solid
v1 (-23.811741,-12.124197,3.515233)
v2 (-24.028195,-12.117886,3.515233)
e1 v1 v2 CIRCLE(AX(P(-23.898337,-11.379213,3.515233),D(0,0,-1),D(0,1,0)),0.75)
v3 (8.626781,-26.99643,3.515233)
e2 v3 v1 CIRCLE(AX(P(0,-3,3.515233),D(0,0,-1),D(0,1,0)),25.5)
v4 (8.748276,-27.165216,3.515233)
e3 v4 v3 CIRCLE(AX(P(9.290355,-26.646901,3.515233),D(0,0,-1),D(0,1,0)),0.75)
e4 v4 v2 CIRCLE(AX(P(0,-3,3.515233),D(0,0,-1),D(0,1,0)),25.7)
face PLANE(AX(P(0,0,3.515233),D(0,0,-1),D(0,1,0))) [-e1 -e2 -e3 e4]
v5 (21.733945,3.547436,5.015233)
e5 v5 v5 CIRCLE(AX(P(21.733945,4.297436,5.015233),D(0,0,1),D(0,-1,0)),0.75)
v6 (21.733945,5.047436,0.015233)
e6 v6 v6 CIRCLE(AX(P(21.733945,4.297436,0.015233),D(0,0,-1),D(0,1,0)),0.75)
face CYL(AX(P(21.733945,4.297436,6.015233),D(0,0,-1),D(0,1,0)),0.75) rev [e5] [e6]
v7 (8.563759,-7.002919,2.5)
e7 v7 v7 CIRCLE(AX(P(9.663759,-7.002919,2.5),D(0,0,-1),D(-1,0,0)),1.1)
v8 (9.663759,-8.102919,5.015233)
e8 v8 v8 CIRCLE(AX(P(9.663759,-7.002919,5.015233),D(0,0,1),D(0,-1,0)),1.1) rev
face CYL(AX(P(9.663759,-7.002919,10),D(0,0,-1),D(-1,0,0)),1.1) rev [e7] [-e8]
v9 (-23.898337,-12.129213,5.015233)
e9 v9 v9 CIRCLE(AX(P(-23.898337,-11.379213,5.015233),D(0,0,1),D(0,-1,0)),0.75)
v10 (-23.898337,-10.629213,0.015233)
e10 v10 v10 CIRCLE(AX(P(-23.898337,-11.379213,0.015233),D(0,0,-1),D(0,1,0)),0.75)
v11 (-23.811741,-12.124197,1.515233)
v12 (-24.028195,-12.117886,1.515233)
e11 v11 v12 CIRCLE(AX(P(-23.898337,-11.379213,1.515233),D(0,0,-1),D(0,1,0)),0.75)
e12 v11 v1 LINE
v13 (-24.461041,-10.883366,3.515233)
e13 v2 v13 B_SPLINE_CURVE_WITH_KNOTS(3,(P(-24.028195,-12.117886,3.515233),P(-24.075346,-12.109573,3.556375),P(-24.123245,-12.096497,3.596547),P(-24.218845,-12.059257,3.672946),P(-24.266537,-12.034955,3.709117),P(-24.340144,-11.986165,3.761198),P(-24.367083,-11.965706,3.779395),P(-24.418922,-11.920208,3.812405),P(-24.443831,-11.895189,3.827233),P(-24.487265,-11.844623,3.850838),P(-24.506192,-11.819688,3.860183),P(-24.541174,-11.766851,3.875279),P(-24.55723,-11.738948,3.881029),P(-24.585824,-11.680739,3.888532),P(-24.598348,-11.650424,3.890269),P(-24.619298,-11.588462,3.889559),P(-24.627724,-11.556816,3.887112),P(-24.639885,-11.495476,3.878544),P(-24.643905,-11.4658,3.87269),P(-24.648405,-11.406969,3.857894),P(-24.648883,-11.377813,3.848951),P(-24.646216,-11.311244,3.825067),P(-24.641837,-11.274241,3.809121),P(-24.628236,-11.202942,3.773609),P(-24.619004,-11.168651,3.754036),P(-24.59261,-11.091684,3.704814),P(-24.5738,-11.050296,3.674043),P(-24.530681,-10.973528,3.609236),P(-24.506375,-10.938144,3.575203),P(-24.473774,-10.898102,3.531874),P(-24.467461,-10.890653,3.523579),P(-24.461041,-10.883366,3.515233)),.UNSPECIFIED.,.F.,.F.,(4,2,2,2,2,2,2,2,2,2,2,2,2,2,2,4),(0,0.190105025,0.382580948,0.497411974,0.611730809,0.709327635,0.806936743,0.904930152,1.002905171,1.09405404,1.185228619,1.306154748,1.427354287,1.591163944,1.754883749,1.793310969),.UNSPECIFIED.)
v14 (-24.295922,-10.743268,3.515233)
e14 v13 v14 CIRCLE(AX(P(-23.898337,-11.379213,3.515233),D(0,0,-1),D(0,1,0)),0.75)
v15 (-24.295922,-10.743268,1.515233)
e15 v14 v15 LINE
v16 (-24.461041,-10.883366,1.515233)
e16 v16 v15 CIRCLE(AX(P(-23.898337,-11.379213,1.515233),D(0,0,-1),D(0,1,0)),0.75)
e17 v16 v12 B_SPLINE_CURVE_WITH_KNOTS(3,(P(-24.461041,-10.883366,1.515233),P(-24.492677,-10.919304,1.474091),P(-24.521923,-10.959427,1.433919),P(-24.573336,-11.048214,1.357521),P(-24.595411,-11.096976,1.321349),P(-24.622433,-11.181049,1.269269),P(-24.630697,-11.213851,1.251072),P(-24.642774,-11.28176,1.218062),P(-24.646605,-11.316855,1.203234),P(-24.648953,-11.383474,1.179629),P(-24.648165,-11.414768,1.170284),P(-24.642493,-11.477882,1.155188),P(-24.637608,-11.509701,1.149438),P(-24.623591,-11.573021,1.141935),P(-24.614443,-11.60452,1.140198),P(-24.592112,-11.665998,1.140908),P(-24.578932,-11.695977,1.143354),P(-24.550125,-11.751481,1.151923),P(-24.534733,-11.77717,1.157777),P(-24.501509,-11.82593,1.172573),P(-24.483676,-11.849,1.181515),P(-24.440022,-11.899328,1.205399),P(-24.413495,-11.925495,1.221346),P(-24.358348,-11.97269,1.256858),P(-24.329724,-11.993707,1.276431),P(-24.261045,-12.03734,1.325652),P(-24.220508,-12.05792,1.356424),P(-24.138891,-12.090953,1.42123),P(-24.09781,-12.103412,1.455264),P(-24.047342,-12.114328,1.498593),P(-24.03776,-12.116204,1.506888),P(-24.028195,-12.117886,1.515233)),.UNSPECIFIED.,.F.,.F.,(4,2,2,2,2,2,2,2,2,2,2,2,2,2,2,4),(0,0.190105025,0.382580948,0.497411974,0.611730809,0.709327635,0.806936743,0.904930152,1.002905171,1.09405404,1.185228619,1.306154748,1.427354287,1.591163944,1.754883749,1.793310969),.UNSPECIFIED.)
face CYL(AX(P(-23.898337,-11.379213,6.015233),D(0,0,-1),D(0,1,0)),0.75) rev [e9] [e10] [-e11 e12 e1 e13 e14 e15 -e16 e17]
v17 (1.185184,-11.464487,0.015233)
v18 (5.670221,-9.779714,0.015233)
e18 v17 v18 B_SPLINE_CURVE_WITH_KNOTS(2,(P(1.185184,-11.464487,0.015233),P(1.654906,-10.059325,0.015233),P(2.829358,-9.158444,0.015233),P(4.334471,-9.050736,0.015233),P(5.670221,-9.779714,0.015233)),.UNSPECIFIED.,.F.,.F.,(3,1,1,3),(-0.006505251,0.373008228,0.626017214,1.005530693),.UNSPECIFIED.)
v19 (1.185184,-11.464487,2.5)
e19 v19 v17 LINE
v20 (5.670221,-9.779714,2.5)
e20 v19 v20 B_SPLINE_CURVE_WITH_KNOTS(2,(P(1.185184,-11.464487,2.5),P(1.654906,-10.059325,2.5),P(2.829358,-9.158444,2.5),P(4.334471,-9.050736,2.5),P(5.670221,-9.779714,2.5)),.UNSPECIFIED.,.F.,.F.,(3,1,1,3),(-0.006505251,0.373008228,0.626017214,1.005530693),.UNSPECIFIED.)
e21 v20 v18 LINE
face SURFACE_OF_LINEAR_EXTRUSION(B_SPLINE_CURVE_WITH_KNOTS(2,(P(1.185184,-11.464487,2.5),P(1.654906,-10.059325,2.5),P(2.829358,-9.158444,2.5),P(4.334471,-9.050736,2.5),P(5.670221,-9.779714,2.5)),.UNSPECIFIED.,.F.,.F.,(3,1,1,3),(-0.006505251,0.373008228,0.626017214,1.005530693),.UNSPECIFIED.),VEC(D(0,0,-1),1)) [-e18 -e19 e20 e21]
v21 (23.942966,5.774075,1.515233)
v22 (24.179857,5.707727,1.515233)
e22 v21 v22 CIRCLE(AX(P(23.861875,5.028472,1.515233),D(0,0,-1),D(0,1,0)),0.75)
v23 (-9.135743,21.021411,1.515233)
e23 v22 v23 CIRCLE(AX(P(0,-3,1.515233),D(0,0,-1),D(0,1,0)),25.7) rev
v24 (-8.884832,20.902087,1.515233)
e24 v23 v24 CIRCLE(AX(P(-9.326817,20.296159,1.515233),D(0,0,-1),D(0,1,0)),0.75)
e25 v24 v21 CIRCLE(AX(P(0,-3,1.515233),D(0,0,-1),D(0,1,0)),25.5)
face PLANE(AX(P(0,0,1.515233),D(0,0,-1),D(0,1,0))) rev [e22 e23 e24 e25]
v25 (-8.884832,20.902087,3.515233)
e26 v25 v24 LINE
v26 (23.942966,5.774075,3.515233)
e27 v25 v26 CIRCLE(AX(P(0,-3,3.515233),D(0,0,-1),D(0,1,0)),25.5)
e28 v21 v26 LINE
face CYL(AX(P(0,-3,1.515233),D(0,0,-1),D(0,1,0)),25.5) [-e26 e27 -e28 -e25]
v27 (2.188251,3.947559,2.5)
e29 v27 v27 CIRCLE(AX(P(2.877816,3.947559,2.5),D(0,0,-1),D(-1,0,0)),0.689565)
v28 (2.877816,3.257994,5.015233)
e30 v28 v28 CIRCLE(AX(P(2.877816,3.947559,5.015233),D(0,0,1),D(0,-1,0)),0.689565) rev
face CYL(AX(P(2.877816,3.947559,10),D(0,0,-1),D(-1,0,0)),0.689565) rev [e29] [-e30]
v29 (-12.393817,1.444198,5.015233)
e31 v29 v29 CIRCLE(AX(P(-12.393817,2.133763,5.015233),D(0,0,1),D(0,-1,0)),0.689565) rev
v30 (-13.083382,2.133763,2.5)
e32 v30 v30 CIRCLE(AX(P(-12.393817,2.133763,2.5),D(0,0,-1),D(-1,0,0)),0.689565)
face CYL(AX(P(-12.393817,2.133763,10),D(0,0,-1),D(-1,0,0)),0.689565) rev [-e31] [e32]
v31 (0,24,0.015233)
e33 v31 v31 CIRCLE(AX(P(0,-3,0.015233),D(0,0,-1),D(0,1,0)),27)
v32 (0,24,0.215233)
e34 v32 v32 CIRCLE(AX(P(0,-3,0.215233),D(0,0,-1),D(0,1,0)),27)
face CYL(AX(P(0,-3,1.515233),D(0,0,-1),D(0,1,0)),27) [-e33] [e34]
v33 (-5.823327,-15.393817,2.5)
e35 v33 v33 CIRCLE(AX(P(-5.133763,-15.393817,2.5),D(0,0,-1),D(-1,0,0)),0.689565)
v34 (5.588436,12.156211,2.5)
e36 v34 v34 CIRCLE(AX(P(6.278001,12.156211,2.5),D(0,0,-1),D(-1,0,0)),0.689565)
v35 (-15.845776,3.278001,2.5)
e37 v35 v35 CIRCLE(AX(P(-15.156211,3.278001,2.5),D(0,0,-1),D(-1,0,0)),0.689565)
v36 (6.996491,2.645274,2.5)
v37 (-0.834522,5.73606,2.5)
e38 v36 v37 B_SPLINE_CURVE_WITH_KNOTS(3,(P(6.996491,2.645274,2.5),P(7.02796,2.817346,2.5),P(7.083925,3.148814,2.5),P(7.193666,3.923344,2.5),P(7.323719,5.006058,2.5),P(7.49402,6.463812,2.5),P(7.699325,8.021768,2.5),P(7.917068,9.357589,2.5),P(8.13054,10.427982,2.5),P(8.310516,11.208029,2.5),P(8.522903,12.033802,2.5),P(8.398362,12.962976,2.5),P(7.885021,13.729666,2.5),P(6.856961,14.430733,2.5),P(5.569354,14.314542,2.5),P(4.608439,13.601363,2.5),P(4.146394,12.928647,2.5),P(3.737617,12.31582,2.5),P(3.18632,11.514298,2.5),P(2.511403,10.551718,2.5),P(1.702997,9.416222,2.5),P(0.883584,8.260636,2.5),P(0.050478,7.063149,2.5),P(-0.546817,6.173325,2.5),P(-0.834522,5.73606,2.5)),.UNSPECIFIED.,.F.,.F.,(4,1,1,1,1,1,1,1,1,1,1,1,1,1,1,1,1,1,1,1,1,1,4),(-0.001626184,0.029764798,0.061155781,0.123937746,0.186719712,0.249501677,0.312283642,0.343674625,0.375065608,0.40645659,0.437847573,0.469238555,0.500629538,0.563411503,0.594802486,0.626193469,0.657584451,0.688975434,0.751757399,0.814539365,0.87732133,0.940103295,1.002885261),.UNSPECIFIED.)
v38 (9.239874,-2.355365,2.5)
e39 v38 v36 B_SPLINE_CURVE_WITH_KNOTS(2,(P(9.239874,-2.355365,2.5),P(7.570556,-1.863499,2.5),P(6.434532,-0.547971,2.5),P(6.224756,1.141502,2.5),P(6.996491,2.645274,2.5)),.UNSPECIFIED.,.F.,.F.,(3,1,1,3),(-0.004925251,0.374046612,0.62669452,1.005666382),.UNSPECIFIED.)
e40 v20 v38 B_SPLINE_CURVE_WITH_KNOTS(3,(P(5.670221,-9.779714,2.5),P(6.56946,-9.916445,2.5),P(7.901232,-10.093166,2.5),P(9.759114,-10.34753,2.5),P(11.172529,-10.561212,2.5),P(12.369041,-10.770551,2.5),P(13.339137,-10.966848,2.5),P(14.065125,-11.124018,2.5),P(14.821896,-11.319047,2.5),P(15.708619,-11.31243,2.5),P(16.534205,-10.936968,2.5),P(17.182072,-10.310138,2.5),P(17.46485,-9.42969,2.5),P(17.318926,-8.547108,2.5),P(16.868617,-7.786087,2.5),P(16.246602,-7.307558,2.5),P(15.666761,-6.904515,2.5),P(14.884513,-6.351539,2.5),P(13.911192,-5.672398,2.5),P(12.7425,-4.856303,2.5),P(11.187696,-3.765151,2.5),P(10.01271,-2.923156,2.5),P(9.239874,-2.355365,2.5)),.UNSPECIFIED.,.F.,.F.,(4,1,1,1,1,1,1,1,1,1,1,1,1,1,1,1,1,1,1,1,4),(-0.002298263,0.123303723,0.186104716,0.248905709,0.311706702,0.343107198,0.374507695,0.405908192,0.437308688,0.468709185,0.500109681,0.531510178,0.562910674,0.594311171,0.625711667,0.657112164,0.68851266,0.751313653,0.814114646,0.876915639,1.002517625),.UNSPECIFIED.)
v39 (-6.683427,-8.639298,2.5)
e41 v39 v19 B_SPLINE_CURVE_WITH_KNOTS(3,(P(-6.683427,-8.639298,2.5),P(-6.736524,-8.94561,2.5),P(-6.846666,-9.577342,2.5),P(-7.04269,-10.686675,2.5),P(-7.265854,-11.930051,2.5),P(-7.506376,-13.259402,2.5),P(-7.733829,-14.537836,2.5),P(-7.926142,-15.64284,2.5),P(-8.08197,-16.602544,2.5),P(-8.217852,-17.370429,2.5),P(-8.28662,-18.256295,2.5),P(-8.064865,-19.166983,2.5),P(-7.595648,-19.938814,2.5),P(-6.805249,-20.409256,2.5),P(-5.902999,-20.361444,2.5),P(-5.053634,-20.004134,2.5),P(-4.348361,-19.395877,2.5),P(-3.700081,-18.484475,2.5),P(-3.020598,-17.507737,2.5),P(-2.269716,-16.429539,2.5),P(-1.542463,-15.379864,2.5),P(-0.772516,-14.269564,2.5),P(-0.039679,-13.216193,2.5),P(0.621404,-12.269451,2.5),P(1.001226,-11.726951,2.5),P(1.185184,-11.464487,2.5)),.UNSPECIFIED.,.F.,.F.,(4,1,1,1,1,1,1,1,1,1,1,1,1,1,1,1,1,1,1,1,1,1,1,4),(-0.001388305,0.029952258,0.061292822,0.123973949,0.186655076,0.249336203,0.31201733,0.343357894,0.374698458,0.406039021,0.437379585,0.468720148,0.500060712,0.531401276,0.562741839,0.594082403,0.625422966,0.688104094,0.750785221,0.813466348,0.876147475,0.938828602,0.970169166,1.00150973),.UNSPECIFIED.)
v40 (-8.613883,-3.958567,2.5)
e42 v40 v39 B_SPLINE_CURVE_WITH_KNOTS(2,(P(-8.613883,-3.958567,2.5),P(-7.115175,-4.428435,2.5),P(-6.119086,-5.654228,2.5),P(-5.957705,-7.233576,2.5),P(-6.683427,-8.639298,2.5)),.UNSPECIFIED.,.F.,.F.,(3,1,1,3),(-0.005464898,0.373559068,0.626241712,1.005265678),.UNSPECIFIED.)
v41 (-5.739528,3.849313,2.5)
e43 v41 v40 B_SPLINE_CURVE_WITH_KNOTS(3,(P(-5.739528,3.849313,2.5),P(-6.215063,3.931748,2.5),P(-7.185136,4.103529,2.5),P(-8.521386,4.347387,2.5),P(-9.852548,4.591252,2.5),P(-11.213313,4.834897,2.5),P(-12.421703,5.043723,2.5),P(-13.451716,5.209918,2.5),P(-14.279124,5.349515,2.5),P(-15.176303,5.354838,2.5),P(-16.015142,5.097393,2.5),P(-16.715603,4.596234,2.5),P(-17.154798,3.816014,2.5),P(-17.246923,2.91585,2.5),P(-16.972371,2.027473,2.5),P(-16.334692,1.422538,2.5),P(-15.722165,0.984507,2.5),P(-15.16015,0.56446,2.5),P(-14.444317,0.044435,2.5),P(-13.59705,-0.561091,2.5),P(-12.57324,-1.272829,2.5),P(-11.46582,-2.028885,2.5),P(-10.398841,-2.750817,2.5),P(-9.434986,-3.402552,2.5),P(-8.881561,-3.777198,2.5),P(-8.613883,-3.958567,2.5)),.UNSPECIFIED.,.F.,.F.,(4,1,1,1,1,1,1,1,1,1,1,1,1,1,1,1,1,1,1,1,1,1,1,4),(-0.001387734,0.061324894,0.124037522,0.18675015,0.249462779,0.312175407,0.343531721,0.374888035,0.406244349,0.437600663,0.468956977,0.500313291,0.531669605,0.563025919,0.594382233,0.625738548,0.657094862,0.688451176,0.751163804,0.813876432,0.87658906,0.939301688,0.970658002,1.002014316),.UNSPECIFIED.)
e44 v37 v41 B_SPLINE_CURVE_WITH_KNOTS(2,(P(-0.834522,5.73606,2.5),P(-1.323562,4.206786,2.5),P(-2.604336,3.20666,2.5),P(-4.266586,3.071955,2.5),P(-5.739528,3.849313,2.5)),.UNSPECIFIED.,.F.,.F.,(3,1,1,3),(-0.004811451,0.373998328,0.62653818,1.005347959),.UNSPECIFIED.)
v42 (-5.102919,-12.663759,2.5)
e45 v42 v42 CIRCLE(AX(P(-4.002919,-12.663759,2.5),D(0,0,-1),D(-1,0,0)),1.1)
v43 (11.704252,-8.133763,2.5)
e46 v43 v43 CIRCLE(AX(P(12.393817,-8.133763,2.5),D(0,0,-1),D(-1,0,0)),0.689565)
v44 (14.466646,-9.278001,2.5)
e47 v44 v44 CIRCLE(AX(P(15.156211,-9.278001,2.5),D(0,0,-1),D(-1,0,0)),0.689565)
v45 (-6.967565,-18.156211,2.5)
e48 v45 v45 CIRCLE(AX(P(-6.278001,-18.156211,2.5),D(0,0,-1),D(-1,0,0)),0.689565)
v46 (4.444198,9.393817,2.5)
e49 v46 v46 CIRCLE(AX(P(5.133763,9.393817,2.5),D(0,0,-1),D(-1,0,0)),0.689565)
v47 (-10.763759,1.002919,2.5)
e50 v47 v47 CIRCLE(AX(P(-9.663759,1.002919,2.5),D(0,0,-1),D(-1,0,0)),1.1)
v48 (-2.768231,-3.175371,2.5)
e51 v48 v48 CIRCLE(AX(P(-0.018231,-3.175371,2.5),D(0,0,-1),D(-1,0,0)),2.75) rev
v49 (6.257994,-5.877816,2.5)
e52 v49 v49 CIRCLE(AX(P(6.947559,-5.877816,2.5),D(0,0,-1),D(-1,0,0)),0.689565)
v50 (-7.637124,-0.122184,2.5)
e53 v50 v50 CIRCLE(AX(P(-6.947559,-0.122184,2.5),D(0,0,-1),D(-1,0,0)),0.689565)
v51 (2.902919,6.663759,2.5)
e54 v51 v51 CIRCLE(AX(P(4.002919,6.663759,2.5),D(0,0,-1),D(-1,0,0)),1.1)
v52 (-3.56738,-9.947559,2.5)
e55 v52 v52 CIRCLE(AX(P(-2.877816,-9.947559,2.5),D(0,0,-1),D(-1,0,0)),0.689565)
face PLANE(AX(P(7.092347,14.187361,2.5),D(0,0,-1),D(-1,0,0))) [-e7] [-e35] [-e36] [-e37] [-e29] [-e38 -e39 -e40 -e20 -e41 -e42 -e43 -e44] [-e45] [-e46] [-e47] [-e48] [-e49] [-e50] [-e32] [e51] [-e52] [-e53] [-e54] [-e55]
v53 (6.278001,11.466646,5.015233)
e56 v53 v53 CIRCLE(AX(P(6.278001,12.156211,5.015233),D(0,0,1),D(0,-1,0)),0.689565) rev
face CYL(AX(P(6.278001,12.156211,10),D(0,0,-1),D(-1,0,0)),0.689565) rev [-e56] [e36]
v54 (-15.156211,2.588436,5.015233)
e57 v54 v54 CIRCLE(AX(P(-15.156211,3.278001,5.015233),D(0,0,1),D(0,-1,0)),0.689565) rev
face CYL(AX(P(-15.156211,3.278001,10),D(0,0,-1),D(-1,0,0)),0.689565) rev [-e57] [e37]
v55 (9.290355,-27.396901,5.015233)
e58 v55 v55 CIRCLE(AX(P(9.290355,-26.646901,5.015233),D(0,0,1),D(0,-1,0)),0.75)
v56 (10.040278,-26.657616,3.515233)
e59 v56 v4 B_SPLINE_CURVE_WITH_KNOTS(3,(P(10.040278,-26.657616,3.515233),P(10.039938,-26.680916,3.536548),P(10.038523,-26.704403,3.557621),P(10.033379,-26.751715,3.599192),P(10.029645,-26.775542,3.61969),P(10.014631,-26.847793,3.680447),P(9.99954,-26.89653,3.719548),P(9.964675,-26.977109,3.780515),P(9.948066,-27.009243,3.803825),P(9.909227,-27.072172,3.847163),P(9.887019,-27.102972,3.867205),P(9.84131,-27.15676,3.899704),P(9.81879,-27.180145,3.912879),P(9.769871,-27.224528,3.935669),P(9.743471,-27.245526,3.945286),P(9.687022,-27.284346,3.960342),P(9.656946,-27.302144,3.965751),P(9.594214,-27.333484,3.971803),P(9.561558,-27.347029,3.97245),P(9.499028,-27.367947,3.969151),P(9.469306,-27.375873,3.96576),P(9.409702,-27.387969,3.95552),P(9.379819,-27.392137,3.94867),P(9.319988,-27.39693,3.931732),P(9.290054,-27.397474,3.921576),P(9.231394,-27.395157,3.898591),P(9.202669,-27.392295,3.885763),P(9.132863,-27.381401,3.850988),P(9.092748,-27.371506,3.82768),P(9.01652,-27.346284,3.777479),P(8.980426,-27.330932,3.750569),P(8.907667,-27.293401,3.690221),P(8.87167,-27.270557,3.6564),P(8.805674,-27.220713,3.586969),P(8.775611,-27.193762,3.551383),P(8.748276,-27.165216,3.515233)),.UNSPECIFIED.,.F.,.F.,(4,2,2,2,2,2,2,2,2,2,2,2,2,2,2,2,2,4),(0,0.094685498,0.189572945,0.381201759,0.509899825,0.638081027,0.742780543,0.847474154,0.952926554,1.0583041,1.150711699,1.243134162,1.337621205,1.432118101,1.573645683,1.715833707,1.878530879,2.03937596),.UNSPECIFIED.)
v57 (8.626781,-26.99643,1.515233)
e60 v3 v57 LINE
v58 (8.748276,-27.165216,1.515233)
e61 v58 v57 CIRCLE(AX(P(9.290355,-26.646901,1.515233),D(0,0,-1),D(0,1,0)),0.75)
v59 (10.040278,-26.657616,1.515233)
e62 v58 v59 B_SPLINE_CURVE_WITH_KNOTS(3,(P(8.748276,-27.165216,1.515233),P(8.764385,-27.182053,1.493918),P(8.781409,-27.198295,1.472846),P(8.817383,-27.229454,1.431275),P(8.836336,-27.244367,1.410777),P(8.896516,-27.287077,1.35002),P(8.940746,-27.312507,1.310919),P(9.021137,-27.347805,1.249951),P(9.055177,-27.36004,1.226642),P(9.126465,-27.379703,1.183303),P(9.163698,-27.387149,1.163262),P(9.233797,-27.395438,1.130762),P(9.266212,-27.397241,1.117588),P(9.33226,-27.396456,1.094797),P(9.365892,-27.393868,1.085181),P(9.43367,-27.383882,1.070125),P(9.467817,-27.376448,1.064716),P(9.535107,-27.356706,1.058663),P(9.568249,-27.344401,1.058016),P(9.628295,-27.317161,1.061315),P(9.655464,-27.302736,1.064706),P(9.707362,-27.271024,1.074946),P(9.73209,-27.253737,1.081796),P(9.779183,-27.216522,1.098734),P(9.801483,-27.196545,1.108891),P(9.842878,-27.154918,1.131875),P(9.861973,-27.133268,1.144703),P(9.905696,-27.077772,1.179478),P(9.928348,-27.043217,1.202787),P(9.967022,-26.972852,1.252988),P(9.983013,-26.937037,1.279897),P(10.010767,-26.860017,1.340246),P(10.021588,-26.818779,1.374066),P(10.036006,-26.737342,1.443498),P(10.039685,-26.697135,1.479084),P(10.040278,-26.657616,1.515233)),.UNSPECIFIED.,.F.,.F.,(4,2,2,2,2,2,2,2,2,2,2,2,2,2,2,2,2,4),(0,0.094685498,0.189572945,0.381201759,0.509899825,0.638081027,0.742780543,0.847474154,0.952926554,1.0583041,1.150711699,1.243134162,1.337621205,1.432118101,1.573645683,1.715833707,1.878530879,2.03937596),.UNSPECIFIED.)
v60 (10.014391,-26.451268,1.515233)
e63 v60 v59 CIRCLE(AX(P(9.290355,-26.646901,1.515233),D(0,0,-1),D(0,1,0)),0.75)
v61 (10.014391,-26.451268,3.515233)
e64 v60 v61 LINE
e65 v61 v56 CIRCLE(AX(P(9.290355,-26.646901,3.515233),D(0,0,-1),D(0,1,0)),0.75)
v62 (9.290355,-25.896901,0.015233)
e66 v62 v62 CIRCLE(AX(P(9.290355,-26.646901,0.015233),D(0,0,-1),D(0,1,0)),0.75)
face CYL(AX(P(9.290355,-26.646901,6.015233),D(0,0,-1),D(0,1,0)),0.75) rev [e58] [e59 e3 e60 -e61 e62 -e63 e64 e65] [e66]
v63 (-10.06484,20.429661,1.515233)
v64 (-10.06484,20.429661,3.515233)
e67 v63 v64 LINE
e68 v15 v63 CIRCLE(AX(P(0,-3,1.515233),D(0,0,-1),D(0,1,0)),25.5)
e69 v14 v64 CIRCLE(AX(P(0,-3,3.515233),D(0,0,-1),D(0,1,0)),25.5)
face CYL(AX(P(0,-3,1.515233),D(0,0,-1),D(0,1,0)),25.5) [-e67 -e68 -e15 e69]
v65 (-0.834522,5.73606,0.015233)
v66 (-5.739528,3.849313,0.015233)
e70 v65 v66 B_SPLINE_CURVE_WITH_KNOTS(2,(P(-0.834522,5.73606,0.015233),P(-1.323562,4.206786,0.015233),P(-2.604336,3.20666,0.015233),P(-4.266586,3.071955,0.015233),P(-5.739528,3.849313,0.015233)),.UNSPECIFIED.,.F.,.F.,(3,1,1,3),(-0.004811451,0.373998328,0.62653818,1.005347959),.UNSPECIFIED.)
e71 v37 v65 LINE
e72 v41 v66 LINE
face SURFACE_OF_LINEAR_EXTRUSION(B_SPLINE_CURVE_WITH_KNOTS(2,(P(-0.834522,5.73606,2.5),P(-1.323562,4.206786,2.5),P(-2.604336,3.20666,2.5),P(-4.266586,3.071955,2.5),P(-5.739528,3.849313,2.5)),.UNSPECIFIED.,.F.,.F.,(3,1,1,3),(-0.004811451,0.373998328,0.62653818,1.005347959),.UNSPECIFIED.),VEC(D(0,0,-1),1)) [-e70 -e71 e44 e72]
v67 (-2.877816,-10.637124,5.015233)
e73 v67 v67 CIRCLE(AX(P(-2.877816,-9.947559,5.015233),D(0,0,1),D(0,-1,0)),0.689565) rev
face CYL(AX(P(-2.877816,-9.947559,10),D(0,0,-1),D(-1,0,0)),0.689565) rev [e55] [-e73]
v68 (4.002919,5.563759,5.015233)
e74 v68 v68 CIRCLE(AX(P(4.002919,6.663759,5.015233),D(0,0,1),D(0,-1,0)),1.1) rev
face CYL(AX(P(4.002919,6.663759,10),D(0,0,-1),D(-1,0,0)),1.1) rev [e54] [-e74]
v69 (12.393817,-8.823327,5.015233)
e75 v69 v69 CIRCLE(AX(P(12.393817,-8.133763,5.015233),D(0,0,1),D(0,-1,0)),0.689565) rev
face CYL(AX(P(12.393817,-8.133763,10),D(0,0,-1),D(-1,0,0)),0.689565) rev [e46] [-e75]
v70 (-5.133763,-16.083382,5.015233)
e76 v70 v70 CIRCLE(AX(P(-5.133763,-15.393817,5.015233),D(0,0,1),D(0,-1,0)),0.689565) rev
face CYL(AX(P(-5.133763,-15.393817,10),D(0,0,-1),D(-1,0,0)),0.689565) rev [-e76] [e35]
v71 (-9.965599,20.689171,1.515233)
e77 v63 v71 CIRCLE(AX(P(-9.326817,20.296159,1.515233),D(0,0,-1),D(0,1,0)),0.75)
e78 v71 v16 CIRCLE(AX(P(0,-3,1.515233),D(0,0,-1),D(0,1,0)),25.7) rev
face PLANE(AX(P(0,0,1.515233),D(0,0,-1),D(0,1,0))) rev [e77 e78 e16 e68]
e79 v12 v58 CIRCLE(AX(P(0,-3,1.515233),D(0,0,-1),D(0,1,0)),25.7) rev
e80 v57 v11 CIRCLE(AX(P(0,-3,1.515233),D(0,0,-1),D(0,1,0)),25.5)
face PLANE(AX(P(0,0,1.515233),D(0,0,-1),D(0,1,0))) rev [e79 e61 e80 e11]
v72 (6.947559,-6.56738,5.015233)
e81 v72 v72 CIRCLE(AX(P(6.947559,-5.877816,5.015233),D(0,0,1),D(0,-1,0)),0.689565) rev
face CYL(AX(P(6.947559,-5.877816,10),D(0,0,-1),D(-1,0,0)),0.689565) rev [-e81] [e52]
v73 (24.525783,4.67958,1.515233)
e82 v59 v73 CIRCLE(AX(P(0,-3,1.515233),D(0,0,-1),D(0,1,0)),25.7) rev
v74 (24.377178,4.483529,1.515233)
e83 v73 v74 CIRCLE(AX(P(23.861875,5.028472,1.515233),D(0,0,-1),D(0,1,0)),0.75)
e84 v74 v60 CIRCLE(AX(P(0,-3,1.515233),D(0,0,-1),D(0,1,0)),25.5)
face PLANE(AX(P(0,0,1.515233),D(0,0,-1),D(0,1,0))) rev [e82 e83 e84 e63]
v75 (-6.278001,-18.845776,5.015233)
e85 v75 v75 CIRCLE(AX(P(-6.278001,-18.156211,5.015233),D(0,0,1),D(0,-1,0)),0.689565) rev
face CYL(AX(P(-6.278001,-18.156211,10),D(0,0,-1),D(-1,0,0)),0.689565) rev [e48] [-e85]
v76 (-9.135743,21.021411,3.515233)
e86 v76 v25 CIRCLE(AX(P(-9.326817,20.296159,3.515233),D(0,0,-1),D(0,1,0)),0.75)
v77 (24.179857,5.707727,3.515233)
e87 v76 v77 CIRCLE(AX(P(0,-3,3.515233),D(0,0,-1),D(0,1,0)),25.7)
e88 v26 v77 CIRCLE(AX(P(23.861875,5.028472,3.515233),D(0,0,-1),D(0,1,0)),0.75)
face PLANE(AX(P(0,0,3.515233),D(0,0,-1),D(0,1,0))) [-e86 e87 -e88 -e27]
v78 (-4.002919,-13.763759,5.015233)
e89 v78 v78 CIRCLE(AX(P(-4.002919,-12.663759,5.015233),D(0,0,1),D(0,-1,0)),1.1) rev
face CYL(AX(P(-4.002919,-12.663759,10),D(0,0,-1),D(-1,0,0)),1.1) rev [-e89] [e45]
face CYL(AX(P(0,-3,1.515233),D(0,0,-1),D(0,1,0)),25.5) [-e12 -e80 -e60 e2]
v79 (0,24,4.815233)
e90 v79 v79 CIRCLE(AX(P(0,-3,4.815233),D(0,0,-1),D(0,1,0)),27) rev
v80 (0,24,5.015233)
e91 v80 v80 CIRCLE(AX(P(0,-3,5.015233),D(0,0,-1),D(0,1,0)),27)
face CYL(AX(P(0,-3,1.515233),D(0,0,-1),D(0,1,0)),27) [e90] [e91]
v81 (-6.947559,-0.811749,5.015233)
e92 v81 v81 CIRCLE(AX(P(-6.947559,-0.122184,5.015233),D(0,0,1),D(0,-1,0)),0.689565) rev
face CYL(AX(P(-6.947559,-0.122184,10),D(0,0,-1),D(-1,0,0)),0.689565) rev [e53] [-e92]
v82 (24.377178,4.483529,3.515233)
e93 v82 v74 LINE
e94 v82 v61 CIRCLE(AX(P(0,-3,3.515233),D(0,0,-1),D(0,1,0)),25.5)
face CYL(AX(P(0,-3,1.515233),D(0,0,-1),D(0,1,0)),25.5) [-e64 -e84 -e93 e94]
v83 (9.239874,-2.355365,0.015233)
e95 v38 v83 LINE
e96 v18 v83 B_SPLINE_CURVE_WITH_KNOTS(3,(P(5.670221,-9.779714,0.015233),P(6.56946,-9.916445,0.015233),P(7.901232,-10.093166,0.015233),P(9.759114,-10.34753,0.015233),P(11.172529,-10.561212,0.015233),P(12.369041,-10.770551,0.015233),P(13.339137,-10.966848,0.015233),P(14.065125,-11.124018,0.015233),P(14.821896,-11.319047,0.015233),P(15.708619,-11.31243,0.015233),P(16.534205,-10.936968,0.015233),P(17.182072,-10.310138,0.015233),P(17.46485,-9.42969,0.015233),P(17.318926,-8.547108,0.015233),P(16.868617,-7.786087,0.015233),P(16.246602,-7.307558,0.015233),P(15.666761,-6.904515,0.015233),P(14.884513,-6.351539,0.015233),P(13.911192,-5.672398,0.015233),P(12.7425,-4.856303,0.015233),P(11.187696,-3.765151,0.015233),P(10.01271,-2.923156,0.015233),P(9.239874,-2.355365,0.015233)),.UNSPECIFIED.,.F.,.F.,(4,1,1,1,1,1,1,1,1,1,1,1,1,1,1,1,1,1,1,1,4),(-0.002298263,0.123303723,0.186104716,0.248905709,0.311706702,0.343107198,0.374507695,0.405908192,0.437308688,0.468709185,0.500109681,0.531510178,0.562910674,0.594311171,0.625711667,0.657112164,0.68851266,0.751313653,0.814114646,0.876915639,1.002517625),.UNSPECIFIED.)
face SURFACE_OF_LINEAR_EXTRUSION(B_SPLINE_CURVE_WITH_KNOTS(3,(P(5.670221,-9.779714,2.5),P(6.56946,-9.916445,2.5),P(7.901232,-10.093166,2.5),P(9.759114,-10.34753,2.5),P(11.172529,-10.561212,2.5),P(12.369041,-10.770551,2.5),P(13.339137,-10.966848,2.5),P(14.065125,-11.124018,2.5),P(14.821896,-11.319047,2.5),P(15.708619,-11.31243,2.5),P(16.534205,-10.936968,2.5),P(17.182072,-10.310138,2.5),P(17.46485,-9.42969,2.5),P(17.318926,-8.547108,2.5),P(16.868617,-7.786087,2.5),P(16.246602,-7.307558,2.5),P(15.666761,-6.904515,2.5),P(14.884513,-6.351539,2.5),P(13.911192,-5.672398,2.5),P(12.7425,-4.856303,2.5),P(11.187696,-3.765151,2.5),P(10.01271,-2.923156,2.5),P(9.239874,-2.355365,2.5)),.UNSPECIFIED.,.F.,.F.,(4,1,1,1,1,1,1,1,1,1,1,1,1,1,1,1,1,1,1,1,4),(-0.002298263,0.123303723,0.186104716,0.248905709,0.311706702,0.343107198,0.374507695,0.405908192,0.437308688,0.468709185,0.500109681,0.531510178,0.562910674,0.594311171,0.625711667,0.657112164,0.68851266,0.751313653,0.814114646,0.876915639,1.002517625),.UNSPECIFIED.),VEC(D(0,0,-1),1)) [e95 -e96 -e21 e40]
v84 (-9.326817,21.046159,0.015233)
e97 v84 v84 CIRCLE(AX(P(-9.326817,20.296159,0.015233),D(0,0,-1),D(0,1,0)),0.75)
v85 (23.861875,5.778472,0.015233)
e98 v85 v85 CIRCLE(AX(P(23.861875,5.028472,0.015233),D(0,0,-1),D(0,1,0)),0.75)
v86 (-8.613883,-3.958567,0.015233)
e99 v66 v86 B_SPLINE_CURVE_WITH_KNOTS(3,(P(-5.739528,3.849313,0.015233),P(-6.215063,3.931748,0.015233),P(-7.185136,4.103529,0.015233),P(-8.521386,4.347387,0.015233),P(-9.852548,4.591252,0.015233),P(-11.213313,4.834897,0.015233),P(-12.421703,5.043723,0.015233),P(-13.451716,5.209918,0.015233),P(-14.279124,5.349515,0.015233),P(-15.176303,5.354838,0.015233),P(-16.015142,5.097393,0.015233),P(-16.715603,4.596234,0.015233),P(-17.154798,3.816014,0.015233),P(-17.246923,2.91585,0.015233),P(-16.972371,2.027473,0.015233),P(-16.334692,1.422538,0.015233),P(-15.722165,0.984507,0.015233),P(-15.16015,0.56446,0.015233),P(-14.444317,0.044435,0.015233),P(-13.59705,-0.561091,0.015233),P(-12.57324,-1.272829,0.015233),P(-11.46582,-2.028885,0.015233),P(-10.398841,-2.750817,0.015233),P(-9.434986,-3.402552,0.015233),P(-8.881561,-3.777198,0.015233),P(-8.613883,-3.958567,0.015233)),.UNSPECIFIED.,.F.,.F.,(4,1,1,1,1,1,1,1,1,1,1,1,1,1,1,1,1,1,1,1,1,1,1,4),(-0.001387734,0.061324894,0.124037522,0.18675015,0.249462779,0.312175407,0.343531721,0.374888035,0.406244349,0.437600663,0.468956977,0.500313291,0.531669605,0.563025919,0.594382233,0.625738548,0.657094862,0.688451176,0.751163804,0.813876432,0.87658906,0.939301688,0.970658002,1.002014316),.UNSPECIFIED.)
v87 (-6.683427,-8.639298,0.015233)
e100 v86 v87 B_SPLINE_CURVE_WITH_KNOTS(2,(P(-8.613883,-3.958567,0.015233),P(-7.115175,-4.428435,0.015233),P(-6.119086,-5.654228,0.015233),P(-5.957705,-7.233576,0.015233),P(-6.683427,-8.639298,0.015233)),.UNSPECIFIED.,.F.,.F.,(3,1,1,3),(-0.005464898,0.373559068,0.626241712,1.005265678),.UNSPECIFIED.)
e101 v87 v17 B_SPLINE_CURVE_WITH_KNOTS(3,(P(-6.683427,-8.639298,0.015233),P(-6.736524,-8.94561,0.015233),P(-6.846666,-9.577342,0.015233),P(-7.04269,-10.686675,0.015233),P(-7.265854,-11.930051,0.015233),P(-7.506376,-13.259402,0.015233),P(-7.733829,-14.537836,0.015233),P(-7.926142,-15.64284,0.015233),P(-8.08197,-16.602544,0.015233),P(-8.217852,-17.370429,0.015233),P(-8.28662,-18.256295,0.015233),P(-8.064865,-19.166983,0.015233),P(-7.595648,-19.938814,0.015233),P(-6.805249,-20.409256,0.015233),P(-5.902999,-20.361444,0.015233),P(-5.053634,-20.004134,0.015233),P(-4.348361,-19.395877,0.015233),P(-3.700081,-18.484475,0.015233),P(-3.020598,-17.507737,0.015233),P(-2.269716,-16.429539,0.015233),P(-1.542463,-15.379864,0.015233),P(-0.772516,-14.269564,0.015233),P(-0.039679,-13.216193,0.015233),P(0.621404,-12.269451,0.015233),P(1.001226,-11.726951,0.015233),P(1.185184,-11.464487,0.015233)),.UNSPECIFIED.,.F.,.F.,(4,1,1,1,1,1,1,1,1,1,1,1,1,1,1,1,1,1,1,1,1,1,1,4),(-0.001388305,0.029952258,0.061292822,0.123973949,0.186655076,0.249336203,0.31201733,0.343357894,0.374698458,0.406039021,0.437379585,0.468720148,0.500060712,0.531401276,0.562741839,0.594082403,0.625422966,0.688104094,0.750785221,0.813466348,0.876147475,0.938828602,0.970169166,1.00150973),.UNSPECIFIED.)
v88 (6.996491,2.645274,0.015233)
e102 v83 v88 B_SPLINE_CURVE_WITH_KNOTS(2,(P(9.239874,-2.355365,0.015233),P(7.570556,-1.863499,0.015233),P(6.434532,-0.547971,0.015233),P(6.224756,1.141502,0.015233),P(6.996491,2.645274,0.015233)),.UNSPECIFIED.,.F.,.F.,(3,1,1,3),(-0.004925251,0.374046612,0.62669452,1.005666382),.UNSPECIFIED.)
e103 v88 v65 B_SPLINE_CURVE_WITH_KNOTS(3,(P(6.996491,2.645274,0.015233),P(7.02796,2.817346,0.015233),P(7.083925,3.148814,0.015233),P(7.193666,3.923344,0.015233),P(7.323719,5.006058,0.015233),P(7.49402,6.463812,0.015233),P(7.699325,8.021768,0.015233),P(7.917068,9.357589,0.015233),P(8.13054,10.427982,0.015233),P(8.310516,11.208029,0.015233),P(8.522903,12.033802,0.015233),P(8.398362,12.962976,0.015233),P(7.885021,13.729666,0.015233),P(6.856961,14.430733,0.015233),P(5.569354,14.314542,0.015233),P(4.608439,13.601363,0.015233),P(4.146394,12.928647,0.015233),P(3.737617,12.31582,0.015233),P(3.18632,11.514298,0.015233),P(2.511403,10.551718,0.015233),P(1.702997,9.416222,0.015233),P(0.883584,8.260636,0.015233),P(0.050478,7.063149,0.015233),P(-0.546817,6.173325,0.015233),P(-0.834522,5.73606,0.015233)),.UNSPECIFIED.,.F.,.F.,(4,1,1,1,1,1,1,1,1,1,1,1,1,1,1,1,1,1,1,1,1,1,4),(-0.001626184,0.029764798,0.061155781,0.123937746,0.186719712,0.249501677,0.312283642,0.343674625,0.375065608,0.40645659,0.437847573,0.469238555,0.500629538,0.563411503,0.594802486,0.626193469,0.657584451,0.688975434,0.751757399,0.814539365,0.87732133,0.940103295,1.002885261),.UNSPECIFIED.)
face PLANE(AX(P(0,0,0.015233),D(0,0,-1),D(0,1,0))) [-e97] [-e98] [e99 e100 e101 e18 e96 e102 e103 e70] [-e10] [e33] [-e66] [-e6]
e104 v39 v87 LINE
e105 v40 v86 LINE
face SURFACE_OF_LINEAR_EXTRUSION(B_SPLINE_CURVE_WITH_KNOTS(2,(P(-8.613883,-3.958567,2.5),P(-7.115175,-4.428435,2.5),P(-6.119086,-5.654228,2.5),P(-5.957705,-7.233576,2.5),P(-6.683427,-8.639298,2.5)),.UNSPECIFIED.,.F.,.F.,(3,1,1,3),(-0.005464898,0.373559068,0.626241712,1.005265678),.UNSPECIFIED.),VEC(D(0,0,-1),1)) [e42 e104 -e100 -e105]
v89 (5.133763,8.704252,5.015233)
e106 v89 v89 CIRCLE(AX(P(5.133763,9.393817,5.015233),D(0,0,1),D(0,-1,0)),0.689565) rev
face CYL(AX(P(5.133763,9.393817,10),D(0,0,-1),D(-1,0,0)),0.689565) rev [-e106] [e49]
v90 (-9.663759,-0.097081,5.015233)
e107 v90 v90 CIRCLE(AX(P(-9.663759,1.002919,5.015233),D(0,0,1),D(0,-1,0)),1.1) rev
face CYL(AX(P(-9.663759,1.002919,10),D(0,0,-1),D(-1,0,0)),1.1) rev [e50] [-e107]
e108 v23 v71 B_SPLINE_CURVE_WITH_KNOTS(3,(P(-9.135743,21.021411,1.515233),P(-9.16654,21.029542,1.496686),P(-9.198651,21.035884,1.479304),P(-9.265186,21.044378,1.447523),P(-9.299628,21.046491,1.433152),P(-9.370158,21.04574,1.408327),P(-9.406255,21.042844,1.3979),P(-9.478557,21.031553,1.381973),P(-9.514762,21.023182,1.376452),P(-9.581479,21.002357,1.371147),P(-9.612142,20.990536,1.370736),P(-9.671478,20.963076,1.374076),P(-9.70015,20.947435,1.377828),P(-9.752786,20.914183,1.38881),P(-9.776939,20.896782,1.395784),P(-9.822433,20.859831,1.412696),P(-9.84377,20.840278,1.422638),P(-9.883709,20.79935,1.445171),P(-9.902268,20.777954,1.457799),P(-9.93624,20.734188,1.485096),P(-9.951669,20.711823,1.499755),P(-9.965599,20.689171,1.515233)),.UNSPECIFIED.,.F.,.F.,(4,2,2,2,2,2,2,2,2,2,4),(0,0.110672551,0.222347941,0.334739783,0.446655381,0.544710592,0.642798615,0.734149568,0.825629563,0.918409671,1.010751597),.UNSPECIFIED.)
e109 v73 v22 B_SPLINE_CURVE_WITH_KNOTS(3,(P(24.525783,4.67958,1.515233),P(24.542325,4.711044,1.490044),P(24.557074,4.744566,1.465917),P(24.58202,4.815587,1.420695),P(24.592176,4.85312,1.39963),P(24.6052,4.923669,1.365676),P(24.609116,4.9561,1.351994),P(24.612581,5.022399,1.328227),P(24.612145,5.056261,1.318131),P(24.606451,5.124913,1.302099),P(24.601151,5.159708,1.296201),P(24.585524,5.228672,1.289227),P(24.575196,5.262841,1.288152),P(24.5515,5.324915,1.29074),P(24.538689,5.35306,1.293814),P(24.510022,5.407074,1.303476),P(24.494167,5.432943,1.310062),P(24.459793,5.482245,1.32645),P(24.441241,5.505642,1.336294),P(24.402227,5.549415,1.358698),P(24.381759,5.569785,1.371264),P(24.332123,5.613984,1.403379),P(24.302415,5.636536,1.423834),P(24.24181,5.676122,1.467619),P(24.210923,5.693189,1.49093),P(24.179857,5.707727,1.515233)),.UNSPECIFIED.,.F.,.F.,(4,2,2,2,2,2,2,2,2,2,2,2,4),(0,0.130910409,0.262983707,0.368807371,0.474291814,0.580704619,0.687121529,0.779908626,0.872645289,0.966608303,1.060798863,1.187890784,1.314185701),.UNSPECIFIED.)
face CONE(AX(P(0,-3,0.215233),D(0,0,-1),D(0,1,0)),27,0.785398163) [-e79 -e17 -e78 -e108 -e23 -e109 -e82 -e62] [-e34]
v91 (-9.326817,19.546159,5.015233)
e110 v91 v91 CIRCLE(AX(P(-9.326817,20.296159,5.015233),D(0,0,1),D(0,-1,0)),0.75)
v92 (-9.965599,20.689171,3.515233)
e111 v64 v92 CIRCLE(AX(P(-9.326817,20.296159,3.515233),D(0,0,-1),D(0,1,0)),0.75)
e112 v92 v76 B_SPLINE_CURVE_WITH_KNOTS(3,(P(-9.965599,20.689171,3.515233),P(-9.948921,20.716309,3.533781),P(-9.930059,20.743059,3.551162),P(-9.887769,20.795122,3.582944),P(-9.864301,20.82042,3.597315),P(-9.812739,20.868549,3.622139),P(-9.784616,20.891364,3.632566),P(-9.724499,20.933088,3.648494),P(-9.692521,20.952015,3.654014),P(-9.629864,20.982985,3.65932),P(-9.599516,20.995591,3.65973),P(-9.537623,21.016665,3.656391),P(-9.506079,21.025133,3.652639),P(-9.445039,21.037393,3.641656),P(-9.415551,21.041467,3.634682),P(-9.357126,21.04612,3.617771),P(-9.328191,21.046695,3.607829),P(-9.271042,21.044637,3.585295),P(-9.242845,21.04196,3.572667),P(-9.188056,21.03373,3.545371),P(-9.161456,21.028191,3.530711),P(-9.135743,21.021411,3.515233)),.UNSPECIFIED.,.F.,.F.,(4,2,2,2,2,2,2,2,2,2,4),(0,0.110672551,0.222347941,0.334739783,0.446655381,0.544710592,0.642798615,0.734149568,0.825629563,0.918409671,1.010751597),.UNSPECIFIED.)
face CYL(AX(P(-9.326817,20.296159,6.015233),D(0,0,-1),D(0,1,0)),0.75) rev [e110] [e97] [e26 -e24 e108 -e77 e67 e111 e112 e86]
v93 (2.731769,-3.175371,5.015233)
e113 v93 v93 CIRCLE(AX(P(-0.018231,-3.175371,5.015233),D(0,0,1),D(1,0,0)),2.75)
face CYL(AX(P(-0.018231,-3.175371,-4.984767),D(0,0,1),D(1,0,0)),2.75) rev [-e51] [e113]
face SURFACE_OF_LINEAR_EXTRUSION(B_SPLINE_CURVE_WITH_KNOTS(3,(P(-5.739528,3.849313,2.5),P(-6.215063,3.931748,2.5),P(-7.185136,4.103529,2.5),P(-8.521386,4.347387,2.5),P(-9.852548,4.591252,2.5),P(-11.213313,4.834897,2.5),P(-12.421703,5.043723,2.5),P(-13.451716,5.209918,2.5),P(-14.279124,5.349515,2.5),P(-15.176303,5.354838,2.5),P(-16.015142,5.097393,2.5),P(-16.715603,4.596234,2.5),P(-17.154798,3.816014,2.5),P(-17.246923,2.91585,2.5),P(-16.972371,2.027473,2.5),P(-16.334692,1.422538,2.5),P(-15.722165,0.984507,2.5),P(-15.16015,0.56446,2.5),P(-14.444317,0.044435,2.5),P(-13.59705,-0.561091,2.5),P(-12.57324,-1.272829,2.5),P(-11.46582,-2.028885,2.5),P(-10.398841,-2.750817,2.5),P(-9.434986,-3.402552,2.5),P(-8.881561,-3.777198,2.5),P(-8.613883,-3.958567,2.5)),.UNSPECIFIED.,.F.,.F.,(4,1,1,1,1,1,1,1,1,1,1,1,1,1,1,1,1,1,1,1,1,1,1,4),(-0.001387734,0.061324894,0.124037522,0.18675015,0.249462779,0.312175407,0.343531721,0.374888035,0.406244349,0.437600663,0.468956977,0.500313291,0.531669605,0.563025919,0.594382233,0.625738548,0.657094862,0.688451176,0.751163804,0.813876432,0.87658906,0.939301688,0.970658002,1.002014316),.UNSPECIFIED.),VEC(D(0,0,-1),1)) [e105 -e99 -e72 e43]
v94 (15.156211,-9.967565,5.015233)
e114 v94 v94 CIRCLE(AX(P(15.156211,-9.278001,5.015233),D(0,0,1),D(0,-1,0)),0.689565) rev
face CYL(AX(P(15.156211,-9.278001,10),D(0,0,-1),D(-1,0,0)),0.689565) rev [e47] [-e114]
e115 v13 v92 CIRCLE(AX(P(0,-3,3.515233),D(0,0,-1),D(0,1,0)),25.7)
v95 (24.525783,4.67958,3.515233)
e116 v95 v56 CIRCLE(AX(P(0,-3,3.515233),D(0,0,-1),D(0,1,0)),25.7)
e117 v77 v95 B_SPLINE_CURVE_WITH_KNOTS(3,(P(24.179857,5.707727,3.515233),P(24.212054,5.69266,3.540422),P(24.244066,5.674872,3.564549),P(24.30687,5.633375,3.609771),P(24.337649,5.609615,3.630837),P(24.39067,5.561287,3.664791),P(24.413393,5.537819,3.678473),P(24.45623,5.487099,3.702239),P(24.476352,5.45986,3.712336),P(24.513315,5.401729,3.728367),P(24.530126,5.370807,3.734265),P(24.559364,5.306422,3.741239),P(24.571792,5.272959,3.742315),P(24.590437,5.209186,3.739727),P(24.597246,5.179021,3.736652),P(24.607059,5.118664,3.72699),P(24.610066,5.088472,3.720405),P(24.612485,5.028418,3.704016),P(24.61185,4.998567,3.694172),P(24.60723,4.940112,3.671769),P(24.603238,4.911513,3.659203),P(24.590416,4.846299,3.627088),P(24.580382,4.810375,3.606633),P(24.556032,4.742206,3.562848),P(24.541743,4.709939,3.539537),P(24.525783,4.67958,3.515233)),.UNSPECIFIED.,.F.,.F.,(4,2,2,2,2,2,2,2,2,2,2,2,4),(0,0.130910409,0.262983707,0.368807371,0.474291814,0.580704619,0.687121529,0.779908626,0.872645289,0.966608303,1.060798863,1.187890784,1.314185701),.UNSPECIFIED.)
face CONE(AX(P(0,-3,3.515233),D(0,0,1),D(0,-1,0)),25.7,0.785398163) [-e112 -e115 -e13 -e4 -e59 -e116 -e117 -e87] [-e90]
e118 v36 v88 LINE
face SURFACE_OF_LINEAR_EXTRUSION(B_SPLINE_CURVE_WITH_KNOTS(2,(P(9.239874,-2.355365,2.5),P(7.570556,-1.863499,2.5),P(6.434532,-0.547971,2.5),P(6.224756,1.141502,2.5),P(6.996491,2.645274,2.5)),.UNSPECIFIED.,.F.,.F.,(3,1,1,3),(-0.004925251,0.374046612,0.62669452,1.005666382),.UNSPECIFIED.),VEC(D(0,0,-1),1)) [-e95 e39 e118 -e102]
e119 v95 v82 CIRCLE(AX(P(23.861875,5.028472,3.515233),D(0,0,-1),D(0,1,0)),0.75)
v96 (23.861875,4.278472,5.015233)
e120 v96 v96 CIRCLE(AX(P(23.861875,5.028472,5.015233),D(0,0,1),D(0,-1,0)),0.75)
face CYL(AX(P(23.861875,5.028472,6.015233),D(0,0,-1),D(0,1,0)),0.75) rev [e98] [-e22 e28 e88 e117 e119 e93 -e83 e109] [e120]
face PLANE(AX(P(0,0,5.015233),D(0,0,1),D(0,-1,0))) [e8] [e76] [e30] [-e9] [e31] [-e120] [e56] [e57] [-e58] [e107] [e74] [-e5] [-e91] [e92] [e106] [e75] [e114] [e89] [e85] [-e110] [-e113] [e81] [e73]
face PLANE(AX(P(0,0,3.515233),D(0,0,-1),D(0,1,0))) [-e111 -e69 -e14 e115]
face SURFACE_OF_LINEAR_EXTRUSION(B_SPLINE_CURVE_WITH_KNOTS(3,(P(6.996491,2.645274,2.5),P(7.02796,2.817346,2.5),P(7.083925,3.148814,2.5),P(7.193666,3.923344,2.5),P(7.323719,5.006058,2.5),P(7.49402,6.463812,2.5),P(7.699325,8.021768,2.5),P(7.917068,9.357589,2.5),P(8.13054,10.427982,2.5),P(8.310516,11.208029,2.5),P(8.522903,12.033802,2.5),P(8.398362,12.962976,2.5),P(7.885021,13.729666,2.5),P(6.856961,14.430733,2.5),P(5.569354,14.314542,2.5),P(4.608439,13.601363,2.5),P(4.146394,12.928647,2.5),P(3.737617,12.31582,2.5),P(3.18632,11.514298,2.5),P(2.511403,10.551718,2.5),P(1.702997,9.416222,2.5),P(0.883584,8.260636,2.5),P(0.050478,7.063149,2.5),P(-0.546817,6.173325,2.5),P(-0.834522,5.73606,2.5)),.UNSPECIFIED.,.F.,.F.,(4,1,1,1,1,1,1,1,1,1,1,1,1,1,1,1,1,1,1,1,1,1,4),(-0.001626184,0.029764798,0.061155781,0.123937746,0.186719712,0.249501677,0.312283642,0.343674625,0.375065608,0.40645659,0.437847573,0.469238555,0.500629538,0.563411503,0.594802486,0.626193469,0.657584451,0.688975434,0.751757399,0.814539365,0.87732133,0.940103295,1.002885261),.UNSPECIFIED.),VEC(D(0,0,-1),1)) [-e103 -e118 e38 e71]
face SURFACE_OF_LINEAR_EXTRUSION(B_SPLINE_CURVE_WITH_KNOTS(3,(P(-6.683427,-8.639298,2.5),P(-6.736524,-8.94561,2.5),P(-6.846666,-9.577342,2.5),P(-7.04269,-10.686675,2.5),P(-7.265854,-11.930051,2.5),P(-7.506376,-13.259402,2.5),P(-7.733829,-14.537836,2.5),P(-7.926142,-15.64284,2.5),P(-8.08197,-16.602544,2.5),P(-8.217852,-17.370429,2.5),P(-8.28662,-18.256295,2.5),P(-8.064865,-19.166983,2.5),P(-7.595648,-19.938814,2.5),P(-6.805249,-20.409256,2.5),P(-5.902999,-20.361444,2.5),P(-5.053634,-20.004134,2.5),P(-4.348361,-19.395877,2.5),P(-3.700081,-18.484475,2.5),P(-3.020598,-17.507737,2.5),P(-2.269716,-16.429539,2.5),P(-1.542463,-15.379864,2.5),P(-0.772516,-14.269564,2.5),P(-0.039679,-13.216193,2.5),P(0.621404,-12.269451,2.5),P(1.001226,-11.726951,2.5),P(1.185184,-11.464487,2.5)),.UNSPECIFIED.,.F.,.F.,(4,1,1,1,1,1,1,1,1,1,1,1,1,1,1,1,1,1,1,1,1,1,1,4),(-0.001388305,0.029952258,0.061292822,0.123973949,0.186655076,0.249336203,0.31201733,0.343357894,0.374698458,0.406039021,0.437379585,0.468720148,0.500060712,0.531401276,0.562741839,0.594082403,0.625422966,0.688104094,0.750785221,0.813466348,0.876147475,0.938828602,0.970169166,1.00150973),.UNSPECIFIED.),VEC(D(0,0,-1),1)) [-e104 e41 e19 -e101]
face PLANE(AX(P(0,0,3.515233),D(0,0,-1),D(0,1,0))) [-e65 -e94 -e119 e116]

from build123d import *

# Parameters (mm, degrees)
ESQUISSE1_W             = 2
ESQUISSE1_H             = 25.5
ESQUISSE2_R             = 2.75
ENL_V_MAT_EXTRU_1_DEPTH = 10
ESQUISSE13_R            = 0.689564765
ESQUISSE13_R_2          = 1.1
ENL_V_MAT_EXTRU_4_DEPTH = 10
ENL_V_MAT_EXTRU_5_DEPTH = 2.5
ESQUISSE15_R            = 0.75
ENL_V_MAT_EXTRU_6_DEPTH = 6
CHANFREIN1_SIZE         = 1.3


with BuildPart() as part:
    # Esquisse1 → Révolution1 (revolve)
    with BuildSketch(Plane(origin=(0, 0, 1.686606393), x_dir=(0, 0, -1), z_dir=(1, 0, 0))):
        with Locations((-0.82862688, 9.75)):
            Rectangle(ESQUISSE1_W, ESQUISSE1_H)
        Polygon((0.17137312, 22.5), (0.17137312, -3), (1.67137312, -3), (1.67137312, 24), (0.17137312, 24), align=None)
        Polygon((-3.32862688, -3), (-1.82862688, -3), (-1.82862688, 22.5), (-1.82862688, 24), (-3.32862688, 24), align=None)
    revolve(axis=Axis((0, -3, 1.515233274), (0, 0, 1)))

    # Esquisse2 → Enlèv. mat.-Extru.1 (cut)
    with BuildSketch(Plane.XY.offset(5.015233274)):
        with Locations((-0.018231274, -3.175370846)):
            Circle(ESQUISSE2_R)
    extrude(amount=-ENL_V_MAT_EXTRU_1_DEPTH, mode=Mode.SUBTRACT)

    # Esquisse13 → Enlèv. mat.-Extru.4 (cut)
    with BuildSketch(Plane.XY):
        with Locations(Location((-2.877815561, -9.947559111, 0), (0, 0, 90))):
            Circle(ESQUISSE13_R)
        with Locations(Location((6.947559111, -5.877815561, 0), (0, 0, 90))):
            Circle(ESQUISSE13_R)
        with Locations(Location((9.663759082, -7.002918985, 0), (0, 0, 90))):
            Circle(ESQUISSE13_R_2)
        with Locations(Location((12.393817217, -8.133762733, 0), (0, 0, 90))):
            Circle(ESQUISSE13_R)
        with Locations(Location((15.156211065, -9.278000569, 0), (0, 0, 90))):
            Circle(ESQUISSE13_R)
        with Locations(Location((2.877815561, 3.947559111, 0), (0, 0, 90))):
            Circle(ESQUISSE13_R)
        with Locations(Location((4.002918985, 6.663759082, 0), (0, 0, 90))):
            Circle(ESQUISSE13_R_2)
        with Locations(Location((5.133762733, 9.393817217, 0), (0, 0, 90))):
            Circle(ESQUISSE13_R)
        with Locations(Location((6.278000569, 12.156211065, 0), (0, 0, 90))):
            Circle(ESQUISSE13_R)
        with Locations(Location((-4.002918985, -12.663759082, 0), (0, 0, 90))):
            Circle(ESQUISSE13_R_2)
        with Locations(Location((-5.133762733, -15.393817217, 0), (0, 0, 90))):
            Circle(ESQUISSE13_R)
        with Locations(Location((-6.278000569, -18.156211065, 0), (0, 0, 90))):
            Circle(ESQUISSE13_R)
        with Locations(Location((-6.947559111, -0.122184439, 0), (0, 0, 90))):
            Circle(ESQUISSE13_R)
        with Locations(Location((-9.663759082, 1.002918985, 0), (0, 0, 90))):
            Circle(ESQUISSE13_R_2)
        with Locations(Location((-12.393817217, 2.133762733, 0), (0, 0, 90))):
            Circle(ESQUISSE13_R)
        with Locations(Location((-15.156211065, 3.278000569, 0), (0, 0, 90))):
            Circle(ESQUISSE13_R)
    extrude(amount=ENL_V_MAT_EXTRU_4_DEPTH, mode=Mode.SUBTRACT)

    # Esquisse14 → Enlèv. mat.-Extru.5 (cut)
    with BuildSketch(Plane.XY):
        with BuildLine():
            add(Edge.make_bspline(
                [(-0.834521935, 5.736060012), (-1.323561854, 4.206786323), (-2.604336043, 3.206660041), (-4.266586192, 3.071955003), (-5.739527965, 3.849312559)],
                knots=[-0.004811451, -0.004811451, -0.004811451, 0.373998328, 0.62653818, 1.005347959, 1.005347959, 1.005347959], degree=2))
            add(Edge.make_bspline(
                [(-5.739527965, 3.849312559), (-6.215062727, 3.931748239), (-7.18513586, 4.103529144), (-8.521385754, 4.347386976), (-9.8525478, 4.591251504), (-11.213312584, 4.834897157), (-12.421703021, 5.043723017), (-13.451716375, 5.209918112), (-14.279124381, 5.349514694), (-15.176302974, 5.354838403), (-16.01514225, 5.097393355), (-16.715602869, 4.596233984), (-17.154797612, 3.816013645), (-17.246922742, 2.915850366), (-16.972371092, 2.027473332), (-16.334691685, 1.422538372), (-15.722165203, 0.98450718), (-15.160149994, 0.564460476), (-14.444317483, 0.044435179), (-13.597049726, -0.561090872), (-12.573240224, -1.272829231), (-11.465820255, -2.02888463), (-10.398841116, -2.750817016), (-9.434985773, -3.402552324), (-8.881560832, -3.777197572), (-8.613882977, -3.958566886)],
                knots=[-0.001387734, -0.001387734, -0.001387734, -0.001387734, 0.061324894, 0.124037522, 0.18675015, 0.249462779, 0.312175407, 0.343531721, 0.374888035, 0.406244349, 0.437600663, 0.468956977, 0.500313291, 0.531669605, 0.563025919, 0.594382233, 0.625738548, 0.657094862, 0.688451176, 0.751163804, 0.813876432, 0.87658906, 0.939301688, 0.970658002, 1.002014316, 1.002014316, 1.002014316, 1.002014316], degree=3))
            add(Edge.make_bspline(
                [(-8.613882977, -3.958566886), (-7.115175315, -4.428435003), (-6.119086182, -5.654227733), (-5.957704531, -7.233576255), (-6.683427054, -8.639297758)],
                knots=[-0.005464898, -0.005464898, -0.005464898, 0.373559068, 0.626241712, 1.005265678, 1.005265678, 1.005265678], degree=2))
            add(Edge.make_bspline(
                [(-6.683427054, -8.639297758), (-6.736524361, -8.945610043), (-6.846666072, -9.577342021), (-7.042690275, -10.686674514), (-7.265854476, -11.930051113), (-7.506375972, -13.259401813), (-7.733828712, -14.537836364), (-7.926142256, -15.642839645), (-8.081969882, -16.60254416), (-8.217852425, -17.370429264), (-8.286620465, -18.25629548), (-8.064865225, -19.166982635), (-7.595647871, -19.938814159), (-6.805249095, -20.409255683), (-5.902998591, -20.361444051), (-5.05363368, -20.004133612), (-4.348361359, -19.395876796), (-3.700080535, -18.484475185), (-3.020597942, -17.507736588), (-2.269715572, -16.42953922), (-1.542463308, -15.3798635), (-0.772516376, -14.269564041), (-0.039679278, -13.216193215), (0.621403807, -12.269451004), (1.001226307, -11.726951139), (1.185184369, -11.464487256)],
                knots=[-0.001388305, -0.001388305, -0.001388305, -0.001388305, 0.029952258, 0.061292822, 0.123973949, 0.186655076, 0.249336203, 0.31201733, 0.343357894, 0.374698458, 0.406039021, 0.437379585, 0.468720148, 0.500060712, 0.531401276, 0.562741839, 0.594082403, 0.625422966, 0.688104094, 0.750785221, 0.813466348, 0.876147475, 0.938828602, 0.970169166, 1.00150973, 1.00150973, 1.00150973, 1.00150973], degree=3))
            add(Edge.make_bspline(
                [(1.185184369, -11.464487256), (1.65490631, -10.059324715), (2.829358422, -9.15844428), (4.33447116, -9.05073647), (5.670220815, -9.779713653)],
                knots=[-0.006505251, -0.006505251, -0.006505251, 0.373008228, 0.626017214, 1.005530693, 1.005530693, 1.005530693], degree=2))
            add(Edge.make_bspline(
                [(5.670220815, -9.779713653), (6.569459508, -9.916444916), (7.901232109, -10.093165819), (9.759113621, -10.347529942), (11.17252884, -10.561212218), (12.369040829, -10.770551448), (13.339136626, -10.966848112), (14.065124948, -11.124018436), (14.821895835, -11.319046534), (15.70861899, -11.312430159), (16.534204861, -10.936968), (17.182071527, -10.310137698), (17.46484991, -9.429689564), (17.318925746, -8.547107531), (16.868617318, -7.786086578), (16.246601622, -7.307558249), (15.666761077, -6.904515186), (14.884513279, -6.351538957), (13.911192215, -5.672398343), (12.742499913, -4.856303143), (11.187695713, -3.765151227), (10.012709728, -2.923155523), (9.239873833, -2.355364652)],
                knots=[-0.002298263, -0.002298263, -0.002298263, -0.002298263, 0.123303723, 0.186104716, 0.248905709, 0.311706702, 0.343107198, 0.374507695, 0.405908192, 0.437308688, 0.468709185, 0.500109681, 0.531510178, 0.562910674, 0.594311171, 0.625711667, 0.657112164, 0.68851266, 0.751313653, 0.814114646, 0.876915639, 1.002517625, 1.002517625, 1.002517625, 1.002517625], degree=3))
            add(Edge.make_bspline(
                [(9.239873833, -2.355364652), (7.570556122, -1.863499203), (6.434531603, -0.547970888), (6.224755639, 1.141501953), (6.996491401, 2.645273855)],
                knots=[-0.004925251, -0.004925251, -0.004925251, 0.374046612, 0.62669452, 1.005666382, 1.005666382, 1.005666382], degree=2))
            add(Edge.make_bspline(
                [(6.996491401, 2.645273855), (7.027959892, 2.817346112), (7.083924673, 3.148814023), (7.1936659, 3.923344094), (7.32371884, 5.006057526), (7.494019942, 6.463811724), (7.699325151, 8.02176849), (7.917067912, 9.357588835), (8.130539857, 10.427981639), (8.310516379, 11.208029269), (8.52290283, 12.033801752), (8.398362089, 12.962975893), (7.885021118, 13.729666175), (6.856960913, 14.4307326), (5.569353873, 14.314542315), (4.608438514, 13.601362603), (4.146393984, 12.928647397), (3.737616682, 12.315820412), (3.186319926, 11.514298153), (2.511403124, 10.551718459), (1.702996836, 9.416222225), (0.8835841, 8.260635797), (0.05047789, 7.063148514), (-0.546817155, 6.17332486), (-0.834521935, 5.736060012)],
                knots=[-0.001626184, -0.001626184, -0.001626184, -0.001626184, 0.029764798, 0.061155781, 0.123937746, 0.186719712, 0.249501677, 0.312283642, 0.343674625, 0.375065608, 0.40645659, 0.437847573, 0.469238555, 0.500629538, 0.563411503, 0.594802486, 0.626193469, 0.657584451, 0.688975434, 0.751757399, 0.814539365, 0.87732133, 0.940103295, 1.002885261, 1.002885261, 1.002885261, 1.002885261], degree=3))
        make_face()
    extrude(amount=ENL_V_MAT_EXTRU_5_DEPTH, mode=Mode.SUBTRACT)

    # Esquisse15 → Enlèv. mat.-Extru.6 (cut)
    with BuildSketch(Plane(origin=(0, 0, 0.015233274), x_dir=(-1, 0, 0), z_dir=(0, 0, -1))):
        with Locations(Location((-21.73394458, 4.29743623, 0), (0, 0, 90))):
            Circle(ESQUISSE15_R)
        with Locations(Location((23.898337375, -11.379213397, 0), (0, 0, 90))):
            Circle(ESQUISSE15_R)
        with Locations(Location((9.326817375, 20.296159245, 0), (0, 0, 90))):
            Circle(ESQUISSE15_R)
        with Locations(Location((-23.861874827, 5.028471705, 0), (0, 0, 90))):
            Circle(ESQUISSE15_R)
        with Locations(Location((-9.290354827, -26.646900937, 0), (0, 0, 90))):
            Circle(ESQUISSE15_R)
    extrude(amount=-ENL_V_MAT_EXTRU_6_DEPTH, mode=Mode.SUBTRACT)

    # Chanfrein1
    # the kernel refuses this chamfer: 1.3 mm, written as the material it takes off along each edge
    with BuildSketch(Plane(origin=(0, -3, 3.515233274), x_dir=(0, 1, 0), z_dir=(1, 0, 0))) as chanfrein1_piece_1:
        Polygon((27 - CHANFREIN1_SIZE, 0), (27, CHANFREIN1_SIZE), (27, 0), align=None)
    revolve(axis=Axis((0, -3, 3.515233274), (0, 0, 1)), mode=Mode.SUBTRACT)
    with BuildSketch(Plane(origin=(0, -3, 1.515233274), x_dir=(0, 1, 0), z_dir=(1, 0, 0))) as chanfrein1_piece_2:
        Polygon((27 - CHANFREIN1_SIZE, 0), (27, -CHANFREIN1_SIZE), (27, 0), align=None)
    revolve(axis=Axis((0, -3, 1.515233274), (0, 0, 1)), mode=Mode.SUBTRACT)


solid = part.part
